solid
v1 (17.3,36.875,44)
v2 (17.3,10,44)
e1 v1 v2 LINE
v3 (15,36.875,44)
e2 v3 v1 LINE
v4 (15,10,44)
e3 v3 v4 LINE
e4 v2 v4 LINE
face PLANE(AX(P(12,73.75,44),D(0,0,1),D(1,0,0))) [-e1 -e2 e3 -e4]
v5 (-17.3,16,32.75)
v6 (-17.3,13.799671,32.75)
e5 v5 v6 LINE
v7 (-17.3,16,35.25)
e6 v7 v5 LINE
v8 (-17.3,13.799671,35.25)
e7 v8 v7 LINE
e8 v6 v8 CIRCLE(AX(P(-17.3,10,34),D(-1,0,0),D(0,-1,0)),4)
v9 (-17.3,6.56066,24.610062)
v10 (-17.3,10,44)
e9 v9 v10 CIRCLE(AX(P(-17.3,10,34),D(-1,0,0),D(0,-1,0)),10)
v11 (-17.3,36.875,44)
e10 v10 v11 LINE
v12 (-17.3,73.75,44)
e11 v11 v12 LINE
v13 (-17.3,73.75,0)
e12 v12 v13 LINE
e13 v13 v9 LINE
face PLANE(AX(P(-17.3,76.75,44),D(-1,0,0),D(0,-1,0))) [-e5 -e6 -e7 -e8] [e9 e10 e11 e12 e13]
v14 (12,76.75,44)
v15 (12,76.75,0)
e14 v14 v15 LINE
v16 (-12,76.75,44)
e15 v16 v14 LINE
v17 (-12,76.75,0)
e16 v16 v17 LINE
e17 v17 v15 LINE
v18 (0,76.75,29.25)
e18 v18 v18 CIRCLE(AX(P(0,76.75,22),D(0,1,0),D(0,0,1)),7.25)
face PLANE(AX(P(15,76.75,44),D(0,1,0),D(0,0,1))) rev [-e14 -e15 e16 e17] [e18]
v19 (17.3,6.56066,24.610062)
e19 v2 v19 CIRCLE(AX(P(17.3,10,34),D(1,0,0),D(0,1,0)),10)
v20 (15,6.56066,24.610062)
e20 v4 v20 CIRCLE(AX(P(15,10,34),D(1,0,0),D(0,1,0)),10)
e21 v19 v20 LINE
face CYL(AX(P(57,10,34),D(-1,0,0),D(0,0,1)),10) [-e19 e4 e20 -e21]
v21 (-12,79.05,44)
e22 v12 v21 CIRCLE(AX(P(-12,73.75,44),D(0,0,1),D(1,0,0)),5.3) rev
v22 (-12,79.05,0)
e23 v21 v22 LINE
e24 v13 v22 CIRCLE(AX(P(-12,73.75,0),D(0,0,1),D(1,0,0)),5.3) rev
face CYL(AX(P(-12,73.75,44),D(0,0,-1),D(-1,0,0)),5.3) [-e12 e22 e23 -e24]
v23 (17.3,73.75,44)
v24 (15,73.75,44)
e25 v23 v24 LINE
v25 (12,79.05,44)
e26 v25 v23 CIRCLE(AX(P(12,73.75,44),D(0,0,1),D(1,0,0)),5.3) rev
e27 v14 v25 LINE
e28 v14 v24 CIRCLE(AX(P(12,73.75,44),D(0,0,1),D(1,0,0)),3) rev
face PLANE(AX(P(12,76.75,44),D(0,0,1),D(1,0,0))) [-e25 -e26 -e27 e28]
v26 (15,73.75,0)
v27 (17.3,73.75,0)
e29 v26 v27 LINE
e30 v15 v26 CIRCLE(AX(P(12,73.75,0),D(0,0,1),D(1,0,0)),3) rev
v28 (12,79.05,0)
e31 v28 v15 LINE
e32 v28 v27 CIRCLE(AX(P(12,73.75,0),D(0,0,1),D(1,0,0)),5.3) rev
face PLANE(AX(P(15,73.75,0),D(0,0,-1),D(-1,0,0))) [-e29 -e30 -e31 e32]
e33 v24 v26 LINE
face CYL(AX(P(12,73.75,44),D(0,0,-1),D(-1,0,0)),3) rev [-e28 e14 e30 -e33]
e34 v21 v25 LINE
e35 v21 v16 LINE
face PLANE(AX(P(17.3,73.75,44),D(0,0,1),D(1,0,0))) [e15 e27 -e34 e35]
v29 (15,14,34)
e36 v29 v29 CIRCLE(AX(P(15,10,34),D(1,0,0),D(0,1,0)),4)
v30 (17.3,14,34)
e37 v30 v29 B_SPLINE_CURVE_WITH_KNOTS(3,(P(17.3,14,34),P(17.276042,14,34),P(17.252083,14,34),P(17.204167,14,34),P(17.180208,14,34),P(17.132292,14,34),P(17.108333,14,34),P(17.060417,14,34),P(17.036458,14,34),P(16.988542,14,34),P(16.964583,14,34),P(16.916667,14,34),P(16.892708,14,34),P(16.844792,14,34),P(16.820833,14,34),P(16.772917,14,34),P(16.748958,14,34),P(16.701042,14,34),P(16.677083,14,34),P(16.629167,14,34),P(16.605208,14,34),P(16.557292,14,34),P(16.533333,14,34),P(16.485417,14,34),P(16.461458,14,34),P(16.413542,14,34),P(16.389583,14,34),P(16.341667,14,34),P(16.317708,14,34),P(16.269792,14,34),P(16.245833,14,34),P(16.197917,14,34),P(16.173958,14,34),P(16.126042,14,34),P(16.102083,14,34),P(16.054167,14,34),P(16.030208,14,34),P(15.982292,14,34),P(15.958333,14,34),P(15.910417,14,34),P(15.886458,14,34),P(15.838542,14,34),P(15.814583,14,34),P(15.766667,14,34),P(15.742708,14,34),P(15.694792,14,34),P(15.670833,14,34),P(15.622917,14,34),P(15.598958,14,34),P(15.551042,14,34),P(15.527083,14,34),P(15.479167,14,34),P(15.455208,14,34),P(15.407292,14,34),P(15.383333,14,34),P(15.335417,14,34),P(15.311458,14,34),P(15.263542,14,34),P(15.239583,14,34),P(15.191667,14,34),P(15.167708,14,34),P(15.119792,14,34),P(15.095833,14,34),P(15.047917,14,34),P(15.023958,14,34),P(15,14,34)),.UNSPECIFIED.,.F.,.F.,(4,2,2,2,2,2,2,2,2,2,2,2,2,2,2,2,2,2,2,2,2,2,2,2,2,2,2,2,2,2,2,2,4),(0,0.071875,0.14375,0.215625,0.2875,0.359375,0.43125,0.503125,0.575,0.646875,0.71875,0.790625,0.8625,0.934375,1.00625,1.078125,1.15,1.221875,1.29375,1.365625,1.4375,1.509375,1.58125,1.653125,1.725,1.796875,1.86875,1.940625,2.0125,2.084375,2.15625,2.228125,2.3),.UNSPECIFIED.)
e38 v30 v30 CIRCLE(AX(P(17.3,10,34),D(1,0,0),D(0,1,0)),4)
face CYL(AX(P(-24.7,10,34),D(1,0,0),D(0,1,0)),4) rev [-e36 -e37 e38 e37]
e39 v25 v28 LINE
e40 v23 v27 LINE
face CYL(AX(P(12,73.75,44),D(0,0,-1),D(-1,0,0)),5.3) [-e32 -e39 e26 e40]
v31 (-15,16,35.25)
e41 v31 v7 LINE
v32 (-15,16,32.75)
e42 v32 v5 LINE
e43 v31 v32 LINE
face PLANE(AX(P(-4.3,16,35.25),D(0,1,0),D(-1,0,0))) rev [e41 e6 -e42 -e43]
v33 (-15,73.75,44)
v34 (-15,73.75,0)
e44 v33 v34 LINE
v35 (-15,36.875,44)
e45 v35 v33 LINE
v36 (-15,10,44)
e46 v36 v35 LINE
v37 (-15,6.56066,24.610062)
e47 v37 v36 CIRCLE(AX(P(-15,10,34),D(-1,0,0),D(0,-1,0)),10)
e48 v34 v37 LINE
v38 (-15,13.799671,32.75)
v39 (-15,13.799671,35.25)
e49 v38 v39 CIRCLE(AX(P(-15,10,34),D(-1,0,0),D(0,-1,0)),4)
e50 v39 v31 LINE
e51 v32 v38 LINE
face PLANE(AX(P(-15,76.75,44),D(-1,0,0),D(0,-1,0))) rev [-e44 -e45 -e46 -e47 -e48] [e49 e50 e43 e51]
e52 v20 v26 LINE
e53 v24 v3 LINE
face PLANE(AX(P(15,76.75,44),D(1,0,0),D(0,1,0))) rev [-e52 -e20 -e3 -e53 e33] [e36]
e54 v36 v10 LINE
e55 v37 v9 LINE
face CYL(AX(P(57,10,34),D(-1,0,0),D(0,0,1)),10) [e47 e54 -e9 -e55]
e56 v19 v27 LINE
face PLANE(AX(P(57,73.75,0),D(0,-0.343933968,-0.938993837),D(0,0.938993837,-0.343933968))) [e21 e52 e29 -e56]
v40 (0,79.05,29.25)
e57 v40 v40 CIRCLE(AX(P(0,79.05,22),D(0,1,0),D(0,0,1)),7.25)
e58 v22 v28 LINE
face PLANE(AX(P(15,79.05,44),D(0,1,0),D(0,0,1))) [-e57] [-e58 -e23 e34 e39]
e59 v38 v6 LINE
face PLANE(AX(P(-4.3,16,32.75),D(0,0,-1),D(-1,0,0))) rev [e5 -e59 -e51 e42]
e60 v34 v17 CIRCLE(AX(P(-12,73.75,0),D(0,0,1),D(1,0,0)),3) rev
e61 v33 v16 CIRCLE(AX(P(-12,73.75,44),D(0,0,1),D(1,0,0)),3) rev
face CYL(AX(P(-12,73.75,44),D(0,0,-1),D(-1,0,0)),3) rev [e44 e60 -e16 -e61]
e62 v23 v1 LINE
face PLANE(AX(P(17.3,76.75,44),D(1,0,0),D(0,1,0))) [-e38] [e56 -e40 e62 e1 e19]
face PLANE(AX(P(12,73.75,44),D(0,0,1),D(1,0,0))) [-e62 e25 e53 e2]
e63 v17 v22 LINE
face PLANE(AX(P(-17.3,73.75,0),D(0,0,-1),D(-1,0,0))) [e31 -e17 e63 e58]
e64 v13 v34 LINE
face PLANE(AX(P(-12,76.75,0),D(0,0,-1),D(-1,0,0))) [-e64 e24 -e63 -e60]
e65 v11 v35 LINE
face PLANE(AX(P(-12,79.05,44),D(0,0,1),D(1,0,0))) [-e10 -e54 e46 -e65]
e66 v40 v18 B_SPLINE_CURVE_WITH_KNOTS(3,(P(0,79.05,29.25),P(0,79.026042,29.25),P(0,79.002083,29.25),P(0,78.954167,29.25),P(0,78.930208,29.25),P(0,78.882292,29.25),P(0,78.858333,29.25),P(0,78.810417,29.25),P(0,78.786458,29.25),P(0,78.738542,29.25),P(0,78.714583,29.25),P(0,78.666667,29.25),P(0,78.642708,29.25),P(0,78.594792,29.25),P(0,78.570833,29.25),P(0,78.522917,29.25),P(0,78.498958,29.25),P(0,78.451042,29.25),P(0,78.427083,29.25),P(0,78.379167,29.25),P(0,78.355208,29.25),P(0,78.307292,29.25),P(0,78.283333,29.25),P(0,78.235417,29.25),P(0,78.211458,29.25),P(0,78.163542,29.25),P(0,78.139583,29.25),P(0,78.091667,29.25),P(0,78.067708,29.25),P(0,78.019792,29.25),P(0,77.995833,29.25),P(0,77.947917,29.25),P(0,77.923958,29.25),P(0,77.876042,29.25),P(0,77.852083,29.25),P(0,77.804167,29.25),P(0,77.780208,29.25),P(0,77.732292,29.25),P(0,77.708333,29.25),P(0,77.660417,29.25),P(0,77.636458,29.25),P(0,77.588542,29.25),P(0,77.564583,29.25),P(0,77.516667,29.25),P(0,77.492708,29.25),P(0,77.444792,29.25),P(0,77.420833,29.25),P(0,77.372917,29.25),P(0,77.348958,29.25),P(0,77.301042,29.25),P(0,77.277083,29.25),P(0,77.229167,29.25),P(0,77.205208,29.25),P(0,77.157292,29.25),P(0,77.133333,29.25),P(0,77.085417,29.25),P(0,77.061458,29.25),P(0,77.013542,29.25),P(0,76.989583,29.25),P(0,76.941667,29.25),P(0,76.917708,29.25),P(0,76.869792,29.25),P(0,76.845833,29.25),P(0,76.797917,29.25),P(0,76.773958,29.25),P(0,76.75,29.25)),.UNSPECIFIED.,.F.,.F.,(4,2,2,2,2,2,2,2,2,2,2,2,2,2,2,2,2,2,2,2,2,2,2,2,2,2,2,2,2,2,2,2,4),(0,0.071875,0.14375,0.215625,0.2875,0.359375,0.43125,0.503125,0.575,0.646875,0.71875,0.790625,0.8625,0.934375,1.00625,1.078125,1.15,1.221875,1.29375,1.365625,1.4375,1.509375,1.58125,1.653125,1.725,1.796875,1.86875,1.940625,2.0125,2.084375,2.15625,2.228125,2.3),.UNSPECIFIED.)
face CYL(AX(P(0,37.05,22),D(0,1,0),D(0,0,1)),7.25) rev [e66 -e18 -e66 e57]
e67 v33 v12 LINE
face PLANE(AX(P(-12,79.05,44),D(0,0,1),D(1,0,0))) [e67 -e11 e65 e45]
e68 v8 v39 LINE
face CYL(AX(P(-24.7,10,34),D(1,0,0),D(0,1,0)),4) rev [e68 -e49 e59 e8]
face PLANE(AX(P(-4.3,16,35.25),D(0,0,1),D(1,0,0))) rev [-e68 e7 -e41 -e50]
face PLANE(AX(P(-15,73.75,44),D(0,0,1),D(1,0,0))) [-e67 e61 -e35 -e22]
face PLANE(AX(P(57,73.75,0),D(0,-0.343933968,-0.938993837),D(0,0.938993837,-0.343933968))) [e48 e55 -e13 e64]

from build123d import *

# Parameters (mm, degrees)
BASE_FLANGE1_DEPTH      = 44
CUT_EXTRUDE1_DEPTH      = 57
CUT_EXTRUDE1_DEPTH_BACK = 42
SKETCH7_R               = 4
CUT_EXTRUDE2_DEPTH      = 42
SKETCH8_R               = 7.25
CUT_EXTRUDE3_DEPTH      = 42
SKETCH9_W               = 2.5
SKETCH9_H               = 6
CUT_EXTRUDE4_DEPTH      = 13


# Sheet-metal steps are written as plain solids
with BuildPart() as part:
    # Sketch1 → Base-Flange1 (new body)
    with BuildSketch(Plane.XY):
        with BuildLine():
            Line((15, 0), (15, 73.75))
            ThreePointArc((15, 73.75), (14.121320344, 75.871320344), (12, 76.75))
            Line((12, 76.75), (-12, 76.75))
            ThreePointArc((-12, 76.75), (-14.121320344, 75.871320344), (-15, 73.75))
            Line((-15, 73.75), (-15, 0))
            Line((-15, 0), (-17.3, 0))
            Line((-17.3, 0), (-17.3, 73.75))
            ThreePointArc((-17.3, 73.75), (-15.74766594, 77.49766594), (-12, 79.05))
            Line((-12, 79.05), (12, 79.05))
            ThreePointArc((12, 79.05), (15.74766594, 77.49766594), (17.3, 73.75))
            Line((17.3, 73.75), (17.3, 0))
            Line((17.3, 0), (15, 0))
        make_face()
    extrude(amount=BASE_FLANGE1_DEPTH)

    # Sketch6 → Cut-Extrude1 (cut, two sides: drawn at the far end of the back side and taken through both)
    with BuildSketch(Plane(origin=(0, 0, 0), x_dir=(0, 0, -1), z_dir=(1, 0, 0)).offset(-CUT_EXTRUDE1_DEPTH_BACK)):
        with BuildLine():
            Line((0, 73.75), (-24.610061631, 6.560660321))
            ThreePointArc((-24.610061631, 6.560660321), (-35.746513142, 0.153696539), (-44, 10))
            Line((-44, 10), (-44, 36.875))
            Line((-44, 36.875), (-75.735832134, 36.875))
            Line((-75.735832134, 36.875), (-75.735832134, -15.470238138))
            Line((-75.735832134, -15.470238138), (20.414497878, -15.470238138))
            Line((20.414497878, -15.470238138), (20.414497878, 73.75))
            Line((20.414497878, 73.75), (0, 73.75))
        make_face()
    extrude(amount=CUT_EXTRUDE1_DEPTH + CUT_EXTRUDE1_DEPTH_BACK, mode=Mode.SUBTRACT)

    # Sketch7 → Cut-Extrude2 (cut)
    with BuildSketch(Plane(origin=(17.3, 0, 0), x_dir=(0, 0, -1), z_dir=(1, 0, 0))):
        with Locations(Location((-34, 10, 0), (0, 0, 90))):
            Circle(SKETCH7_R)
    extrude(amount=-CUT_EXTRUDE2_DEPTH, mode=Mode.SUBTRACT)

    # Sketch8 → Cut-Extrude3 (cut)
    with BuildSketch(Plane(origin=(0, 79.05, 0), x_dir=(1, 0, 0), z_dir=(0, 1, 0))):
        with Locations(Location((0, -22, 0), (0, 0, 270))):
            Circle(SKETCH8_R)
    extrude(amount=-CUT_EXTRUDE3_DEPTH, mode=Mode.SUBTRACT)

    # Sketch9 → Cut-Extrude4 (cut)
    with BuildSketch(Plane.ZY.offset(17.3)):
        with Locations((34, 13)):
            Rectangle(SKETCH9_W, SKETCH9_H)
    extrude(amount=-CUT_EXTRUDE4_DEPTH, mode=Mode.SUBTRACT)


solid = part.part
